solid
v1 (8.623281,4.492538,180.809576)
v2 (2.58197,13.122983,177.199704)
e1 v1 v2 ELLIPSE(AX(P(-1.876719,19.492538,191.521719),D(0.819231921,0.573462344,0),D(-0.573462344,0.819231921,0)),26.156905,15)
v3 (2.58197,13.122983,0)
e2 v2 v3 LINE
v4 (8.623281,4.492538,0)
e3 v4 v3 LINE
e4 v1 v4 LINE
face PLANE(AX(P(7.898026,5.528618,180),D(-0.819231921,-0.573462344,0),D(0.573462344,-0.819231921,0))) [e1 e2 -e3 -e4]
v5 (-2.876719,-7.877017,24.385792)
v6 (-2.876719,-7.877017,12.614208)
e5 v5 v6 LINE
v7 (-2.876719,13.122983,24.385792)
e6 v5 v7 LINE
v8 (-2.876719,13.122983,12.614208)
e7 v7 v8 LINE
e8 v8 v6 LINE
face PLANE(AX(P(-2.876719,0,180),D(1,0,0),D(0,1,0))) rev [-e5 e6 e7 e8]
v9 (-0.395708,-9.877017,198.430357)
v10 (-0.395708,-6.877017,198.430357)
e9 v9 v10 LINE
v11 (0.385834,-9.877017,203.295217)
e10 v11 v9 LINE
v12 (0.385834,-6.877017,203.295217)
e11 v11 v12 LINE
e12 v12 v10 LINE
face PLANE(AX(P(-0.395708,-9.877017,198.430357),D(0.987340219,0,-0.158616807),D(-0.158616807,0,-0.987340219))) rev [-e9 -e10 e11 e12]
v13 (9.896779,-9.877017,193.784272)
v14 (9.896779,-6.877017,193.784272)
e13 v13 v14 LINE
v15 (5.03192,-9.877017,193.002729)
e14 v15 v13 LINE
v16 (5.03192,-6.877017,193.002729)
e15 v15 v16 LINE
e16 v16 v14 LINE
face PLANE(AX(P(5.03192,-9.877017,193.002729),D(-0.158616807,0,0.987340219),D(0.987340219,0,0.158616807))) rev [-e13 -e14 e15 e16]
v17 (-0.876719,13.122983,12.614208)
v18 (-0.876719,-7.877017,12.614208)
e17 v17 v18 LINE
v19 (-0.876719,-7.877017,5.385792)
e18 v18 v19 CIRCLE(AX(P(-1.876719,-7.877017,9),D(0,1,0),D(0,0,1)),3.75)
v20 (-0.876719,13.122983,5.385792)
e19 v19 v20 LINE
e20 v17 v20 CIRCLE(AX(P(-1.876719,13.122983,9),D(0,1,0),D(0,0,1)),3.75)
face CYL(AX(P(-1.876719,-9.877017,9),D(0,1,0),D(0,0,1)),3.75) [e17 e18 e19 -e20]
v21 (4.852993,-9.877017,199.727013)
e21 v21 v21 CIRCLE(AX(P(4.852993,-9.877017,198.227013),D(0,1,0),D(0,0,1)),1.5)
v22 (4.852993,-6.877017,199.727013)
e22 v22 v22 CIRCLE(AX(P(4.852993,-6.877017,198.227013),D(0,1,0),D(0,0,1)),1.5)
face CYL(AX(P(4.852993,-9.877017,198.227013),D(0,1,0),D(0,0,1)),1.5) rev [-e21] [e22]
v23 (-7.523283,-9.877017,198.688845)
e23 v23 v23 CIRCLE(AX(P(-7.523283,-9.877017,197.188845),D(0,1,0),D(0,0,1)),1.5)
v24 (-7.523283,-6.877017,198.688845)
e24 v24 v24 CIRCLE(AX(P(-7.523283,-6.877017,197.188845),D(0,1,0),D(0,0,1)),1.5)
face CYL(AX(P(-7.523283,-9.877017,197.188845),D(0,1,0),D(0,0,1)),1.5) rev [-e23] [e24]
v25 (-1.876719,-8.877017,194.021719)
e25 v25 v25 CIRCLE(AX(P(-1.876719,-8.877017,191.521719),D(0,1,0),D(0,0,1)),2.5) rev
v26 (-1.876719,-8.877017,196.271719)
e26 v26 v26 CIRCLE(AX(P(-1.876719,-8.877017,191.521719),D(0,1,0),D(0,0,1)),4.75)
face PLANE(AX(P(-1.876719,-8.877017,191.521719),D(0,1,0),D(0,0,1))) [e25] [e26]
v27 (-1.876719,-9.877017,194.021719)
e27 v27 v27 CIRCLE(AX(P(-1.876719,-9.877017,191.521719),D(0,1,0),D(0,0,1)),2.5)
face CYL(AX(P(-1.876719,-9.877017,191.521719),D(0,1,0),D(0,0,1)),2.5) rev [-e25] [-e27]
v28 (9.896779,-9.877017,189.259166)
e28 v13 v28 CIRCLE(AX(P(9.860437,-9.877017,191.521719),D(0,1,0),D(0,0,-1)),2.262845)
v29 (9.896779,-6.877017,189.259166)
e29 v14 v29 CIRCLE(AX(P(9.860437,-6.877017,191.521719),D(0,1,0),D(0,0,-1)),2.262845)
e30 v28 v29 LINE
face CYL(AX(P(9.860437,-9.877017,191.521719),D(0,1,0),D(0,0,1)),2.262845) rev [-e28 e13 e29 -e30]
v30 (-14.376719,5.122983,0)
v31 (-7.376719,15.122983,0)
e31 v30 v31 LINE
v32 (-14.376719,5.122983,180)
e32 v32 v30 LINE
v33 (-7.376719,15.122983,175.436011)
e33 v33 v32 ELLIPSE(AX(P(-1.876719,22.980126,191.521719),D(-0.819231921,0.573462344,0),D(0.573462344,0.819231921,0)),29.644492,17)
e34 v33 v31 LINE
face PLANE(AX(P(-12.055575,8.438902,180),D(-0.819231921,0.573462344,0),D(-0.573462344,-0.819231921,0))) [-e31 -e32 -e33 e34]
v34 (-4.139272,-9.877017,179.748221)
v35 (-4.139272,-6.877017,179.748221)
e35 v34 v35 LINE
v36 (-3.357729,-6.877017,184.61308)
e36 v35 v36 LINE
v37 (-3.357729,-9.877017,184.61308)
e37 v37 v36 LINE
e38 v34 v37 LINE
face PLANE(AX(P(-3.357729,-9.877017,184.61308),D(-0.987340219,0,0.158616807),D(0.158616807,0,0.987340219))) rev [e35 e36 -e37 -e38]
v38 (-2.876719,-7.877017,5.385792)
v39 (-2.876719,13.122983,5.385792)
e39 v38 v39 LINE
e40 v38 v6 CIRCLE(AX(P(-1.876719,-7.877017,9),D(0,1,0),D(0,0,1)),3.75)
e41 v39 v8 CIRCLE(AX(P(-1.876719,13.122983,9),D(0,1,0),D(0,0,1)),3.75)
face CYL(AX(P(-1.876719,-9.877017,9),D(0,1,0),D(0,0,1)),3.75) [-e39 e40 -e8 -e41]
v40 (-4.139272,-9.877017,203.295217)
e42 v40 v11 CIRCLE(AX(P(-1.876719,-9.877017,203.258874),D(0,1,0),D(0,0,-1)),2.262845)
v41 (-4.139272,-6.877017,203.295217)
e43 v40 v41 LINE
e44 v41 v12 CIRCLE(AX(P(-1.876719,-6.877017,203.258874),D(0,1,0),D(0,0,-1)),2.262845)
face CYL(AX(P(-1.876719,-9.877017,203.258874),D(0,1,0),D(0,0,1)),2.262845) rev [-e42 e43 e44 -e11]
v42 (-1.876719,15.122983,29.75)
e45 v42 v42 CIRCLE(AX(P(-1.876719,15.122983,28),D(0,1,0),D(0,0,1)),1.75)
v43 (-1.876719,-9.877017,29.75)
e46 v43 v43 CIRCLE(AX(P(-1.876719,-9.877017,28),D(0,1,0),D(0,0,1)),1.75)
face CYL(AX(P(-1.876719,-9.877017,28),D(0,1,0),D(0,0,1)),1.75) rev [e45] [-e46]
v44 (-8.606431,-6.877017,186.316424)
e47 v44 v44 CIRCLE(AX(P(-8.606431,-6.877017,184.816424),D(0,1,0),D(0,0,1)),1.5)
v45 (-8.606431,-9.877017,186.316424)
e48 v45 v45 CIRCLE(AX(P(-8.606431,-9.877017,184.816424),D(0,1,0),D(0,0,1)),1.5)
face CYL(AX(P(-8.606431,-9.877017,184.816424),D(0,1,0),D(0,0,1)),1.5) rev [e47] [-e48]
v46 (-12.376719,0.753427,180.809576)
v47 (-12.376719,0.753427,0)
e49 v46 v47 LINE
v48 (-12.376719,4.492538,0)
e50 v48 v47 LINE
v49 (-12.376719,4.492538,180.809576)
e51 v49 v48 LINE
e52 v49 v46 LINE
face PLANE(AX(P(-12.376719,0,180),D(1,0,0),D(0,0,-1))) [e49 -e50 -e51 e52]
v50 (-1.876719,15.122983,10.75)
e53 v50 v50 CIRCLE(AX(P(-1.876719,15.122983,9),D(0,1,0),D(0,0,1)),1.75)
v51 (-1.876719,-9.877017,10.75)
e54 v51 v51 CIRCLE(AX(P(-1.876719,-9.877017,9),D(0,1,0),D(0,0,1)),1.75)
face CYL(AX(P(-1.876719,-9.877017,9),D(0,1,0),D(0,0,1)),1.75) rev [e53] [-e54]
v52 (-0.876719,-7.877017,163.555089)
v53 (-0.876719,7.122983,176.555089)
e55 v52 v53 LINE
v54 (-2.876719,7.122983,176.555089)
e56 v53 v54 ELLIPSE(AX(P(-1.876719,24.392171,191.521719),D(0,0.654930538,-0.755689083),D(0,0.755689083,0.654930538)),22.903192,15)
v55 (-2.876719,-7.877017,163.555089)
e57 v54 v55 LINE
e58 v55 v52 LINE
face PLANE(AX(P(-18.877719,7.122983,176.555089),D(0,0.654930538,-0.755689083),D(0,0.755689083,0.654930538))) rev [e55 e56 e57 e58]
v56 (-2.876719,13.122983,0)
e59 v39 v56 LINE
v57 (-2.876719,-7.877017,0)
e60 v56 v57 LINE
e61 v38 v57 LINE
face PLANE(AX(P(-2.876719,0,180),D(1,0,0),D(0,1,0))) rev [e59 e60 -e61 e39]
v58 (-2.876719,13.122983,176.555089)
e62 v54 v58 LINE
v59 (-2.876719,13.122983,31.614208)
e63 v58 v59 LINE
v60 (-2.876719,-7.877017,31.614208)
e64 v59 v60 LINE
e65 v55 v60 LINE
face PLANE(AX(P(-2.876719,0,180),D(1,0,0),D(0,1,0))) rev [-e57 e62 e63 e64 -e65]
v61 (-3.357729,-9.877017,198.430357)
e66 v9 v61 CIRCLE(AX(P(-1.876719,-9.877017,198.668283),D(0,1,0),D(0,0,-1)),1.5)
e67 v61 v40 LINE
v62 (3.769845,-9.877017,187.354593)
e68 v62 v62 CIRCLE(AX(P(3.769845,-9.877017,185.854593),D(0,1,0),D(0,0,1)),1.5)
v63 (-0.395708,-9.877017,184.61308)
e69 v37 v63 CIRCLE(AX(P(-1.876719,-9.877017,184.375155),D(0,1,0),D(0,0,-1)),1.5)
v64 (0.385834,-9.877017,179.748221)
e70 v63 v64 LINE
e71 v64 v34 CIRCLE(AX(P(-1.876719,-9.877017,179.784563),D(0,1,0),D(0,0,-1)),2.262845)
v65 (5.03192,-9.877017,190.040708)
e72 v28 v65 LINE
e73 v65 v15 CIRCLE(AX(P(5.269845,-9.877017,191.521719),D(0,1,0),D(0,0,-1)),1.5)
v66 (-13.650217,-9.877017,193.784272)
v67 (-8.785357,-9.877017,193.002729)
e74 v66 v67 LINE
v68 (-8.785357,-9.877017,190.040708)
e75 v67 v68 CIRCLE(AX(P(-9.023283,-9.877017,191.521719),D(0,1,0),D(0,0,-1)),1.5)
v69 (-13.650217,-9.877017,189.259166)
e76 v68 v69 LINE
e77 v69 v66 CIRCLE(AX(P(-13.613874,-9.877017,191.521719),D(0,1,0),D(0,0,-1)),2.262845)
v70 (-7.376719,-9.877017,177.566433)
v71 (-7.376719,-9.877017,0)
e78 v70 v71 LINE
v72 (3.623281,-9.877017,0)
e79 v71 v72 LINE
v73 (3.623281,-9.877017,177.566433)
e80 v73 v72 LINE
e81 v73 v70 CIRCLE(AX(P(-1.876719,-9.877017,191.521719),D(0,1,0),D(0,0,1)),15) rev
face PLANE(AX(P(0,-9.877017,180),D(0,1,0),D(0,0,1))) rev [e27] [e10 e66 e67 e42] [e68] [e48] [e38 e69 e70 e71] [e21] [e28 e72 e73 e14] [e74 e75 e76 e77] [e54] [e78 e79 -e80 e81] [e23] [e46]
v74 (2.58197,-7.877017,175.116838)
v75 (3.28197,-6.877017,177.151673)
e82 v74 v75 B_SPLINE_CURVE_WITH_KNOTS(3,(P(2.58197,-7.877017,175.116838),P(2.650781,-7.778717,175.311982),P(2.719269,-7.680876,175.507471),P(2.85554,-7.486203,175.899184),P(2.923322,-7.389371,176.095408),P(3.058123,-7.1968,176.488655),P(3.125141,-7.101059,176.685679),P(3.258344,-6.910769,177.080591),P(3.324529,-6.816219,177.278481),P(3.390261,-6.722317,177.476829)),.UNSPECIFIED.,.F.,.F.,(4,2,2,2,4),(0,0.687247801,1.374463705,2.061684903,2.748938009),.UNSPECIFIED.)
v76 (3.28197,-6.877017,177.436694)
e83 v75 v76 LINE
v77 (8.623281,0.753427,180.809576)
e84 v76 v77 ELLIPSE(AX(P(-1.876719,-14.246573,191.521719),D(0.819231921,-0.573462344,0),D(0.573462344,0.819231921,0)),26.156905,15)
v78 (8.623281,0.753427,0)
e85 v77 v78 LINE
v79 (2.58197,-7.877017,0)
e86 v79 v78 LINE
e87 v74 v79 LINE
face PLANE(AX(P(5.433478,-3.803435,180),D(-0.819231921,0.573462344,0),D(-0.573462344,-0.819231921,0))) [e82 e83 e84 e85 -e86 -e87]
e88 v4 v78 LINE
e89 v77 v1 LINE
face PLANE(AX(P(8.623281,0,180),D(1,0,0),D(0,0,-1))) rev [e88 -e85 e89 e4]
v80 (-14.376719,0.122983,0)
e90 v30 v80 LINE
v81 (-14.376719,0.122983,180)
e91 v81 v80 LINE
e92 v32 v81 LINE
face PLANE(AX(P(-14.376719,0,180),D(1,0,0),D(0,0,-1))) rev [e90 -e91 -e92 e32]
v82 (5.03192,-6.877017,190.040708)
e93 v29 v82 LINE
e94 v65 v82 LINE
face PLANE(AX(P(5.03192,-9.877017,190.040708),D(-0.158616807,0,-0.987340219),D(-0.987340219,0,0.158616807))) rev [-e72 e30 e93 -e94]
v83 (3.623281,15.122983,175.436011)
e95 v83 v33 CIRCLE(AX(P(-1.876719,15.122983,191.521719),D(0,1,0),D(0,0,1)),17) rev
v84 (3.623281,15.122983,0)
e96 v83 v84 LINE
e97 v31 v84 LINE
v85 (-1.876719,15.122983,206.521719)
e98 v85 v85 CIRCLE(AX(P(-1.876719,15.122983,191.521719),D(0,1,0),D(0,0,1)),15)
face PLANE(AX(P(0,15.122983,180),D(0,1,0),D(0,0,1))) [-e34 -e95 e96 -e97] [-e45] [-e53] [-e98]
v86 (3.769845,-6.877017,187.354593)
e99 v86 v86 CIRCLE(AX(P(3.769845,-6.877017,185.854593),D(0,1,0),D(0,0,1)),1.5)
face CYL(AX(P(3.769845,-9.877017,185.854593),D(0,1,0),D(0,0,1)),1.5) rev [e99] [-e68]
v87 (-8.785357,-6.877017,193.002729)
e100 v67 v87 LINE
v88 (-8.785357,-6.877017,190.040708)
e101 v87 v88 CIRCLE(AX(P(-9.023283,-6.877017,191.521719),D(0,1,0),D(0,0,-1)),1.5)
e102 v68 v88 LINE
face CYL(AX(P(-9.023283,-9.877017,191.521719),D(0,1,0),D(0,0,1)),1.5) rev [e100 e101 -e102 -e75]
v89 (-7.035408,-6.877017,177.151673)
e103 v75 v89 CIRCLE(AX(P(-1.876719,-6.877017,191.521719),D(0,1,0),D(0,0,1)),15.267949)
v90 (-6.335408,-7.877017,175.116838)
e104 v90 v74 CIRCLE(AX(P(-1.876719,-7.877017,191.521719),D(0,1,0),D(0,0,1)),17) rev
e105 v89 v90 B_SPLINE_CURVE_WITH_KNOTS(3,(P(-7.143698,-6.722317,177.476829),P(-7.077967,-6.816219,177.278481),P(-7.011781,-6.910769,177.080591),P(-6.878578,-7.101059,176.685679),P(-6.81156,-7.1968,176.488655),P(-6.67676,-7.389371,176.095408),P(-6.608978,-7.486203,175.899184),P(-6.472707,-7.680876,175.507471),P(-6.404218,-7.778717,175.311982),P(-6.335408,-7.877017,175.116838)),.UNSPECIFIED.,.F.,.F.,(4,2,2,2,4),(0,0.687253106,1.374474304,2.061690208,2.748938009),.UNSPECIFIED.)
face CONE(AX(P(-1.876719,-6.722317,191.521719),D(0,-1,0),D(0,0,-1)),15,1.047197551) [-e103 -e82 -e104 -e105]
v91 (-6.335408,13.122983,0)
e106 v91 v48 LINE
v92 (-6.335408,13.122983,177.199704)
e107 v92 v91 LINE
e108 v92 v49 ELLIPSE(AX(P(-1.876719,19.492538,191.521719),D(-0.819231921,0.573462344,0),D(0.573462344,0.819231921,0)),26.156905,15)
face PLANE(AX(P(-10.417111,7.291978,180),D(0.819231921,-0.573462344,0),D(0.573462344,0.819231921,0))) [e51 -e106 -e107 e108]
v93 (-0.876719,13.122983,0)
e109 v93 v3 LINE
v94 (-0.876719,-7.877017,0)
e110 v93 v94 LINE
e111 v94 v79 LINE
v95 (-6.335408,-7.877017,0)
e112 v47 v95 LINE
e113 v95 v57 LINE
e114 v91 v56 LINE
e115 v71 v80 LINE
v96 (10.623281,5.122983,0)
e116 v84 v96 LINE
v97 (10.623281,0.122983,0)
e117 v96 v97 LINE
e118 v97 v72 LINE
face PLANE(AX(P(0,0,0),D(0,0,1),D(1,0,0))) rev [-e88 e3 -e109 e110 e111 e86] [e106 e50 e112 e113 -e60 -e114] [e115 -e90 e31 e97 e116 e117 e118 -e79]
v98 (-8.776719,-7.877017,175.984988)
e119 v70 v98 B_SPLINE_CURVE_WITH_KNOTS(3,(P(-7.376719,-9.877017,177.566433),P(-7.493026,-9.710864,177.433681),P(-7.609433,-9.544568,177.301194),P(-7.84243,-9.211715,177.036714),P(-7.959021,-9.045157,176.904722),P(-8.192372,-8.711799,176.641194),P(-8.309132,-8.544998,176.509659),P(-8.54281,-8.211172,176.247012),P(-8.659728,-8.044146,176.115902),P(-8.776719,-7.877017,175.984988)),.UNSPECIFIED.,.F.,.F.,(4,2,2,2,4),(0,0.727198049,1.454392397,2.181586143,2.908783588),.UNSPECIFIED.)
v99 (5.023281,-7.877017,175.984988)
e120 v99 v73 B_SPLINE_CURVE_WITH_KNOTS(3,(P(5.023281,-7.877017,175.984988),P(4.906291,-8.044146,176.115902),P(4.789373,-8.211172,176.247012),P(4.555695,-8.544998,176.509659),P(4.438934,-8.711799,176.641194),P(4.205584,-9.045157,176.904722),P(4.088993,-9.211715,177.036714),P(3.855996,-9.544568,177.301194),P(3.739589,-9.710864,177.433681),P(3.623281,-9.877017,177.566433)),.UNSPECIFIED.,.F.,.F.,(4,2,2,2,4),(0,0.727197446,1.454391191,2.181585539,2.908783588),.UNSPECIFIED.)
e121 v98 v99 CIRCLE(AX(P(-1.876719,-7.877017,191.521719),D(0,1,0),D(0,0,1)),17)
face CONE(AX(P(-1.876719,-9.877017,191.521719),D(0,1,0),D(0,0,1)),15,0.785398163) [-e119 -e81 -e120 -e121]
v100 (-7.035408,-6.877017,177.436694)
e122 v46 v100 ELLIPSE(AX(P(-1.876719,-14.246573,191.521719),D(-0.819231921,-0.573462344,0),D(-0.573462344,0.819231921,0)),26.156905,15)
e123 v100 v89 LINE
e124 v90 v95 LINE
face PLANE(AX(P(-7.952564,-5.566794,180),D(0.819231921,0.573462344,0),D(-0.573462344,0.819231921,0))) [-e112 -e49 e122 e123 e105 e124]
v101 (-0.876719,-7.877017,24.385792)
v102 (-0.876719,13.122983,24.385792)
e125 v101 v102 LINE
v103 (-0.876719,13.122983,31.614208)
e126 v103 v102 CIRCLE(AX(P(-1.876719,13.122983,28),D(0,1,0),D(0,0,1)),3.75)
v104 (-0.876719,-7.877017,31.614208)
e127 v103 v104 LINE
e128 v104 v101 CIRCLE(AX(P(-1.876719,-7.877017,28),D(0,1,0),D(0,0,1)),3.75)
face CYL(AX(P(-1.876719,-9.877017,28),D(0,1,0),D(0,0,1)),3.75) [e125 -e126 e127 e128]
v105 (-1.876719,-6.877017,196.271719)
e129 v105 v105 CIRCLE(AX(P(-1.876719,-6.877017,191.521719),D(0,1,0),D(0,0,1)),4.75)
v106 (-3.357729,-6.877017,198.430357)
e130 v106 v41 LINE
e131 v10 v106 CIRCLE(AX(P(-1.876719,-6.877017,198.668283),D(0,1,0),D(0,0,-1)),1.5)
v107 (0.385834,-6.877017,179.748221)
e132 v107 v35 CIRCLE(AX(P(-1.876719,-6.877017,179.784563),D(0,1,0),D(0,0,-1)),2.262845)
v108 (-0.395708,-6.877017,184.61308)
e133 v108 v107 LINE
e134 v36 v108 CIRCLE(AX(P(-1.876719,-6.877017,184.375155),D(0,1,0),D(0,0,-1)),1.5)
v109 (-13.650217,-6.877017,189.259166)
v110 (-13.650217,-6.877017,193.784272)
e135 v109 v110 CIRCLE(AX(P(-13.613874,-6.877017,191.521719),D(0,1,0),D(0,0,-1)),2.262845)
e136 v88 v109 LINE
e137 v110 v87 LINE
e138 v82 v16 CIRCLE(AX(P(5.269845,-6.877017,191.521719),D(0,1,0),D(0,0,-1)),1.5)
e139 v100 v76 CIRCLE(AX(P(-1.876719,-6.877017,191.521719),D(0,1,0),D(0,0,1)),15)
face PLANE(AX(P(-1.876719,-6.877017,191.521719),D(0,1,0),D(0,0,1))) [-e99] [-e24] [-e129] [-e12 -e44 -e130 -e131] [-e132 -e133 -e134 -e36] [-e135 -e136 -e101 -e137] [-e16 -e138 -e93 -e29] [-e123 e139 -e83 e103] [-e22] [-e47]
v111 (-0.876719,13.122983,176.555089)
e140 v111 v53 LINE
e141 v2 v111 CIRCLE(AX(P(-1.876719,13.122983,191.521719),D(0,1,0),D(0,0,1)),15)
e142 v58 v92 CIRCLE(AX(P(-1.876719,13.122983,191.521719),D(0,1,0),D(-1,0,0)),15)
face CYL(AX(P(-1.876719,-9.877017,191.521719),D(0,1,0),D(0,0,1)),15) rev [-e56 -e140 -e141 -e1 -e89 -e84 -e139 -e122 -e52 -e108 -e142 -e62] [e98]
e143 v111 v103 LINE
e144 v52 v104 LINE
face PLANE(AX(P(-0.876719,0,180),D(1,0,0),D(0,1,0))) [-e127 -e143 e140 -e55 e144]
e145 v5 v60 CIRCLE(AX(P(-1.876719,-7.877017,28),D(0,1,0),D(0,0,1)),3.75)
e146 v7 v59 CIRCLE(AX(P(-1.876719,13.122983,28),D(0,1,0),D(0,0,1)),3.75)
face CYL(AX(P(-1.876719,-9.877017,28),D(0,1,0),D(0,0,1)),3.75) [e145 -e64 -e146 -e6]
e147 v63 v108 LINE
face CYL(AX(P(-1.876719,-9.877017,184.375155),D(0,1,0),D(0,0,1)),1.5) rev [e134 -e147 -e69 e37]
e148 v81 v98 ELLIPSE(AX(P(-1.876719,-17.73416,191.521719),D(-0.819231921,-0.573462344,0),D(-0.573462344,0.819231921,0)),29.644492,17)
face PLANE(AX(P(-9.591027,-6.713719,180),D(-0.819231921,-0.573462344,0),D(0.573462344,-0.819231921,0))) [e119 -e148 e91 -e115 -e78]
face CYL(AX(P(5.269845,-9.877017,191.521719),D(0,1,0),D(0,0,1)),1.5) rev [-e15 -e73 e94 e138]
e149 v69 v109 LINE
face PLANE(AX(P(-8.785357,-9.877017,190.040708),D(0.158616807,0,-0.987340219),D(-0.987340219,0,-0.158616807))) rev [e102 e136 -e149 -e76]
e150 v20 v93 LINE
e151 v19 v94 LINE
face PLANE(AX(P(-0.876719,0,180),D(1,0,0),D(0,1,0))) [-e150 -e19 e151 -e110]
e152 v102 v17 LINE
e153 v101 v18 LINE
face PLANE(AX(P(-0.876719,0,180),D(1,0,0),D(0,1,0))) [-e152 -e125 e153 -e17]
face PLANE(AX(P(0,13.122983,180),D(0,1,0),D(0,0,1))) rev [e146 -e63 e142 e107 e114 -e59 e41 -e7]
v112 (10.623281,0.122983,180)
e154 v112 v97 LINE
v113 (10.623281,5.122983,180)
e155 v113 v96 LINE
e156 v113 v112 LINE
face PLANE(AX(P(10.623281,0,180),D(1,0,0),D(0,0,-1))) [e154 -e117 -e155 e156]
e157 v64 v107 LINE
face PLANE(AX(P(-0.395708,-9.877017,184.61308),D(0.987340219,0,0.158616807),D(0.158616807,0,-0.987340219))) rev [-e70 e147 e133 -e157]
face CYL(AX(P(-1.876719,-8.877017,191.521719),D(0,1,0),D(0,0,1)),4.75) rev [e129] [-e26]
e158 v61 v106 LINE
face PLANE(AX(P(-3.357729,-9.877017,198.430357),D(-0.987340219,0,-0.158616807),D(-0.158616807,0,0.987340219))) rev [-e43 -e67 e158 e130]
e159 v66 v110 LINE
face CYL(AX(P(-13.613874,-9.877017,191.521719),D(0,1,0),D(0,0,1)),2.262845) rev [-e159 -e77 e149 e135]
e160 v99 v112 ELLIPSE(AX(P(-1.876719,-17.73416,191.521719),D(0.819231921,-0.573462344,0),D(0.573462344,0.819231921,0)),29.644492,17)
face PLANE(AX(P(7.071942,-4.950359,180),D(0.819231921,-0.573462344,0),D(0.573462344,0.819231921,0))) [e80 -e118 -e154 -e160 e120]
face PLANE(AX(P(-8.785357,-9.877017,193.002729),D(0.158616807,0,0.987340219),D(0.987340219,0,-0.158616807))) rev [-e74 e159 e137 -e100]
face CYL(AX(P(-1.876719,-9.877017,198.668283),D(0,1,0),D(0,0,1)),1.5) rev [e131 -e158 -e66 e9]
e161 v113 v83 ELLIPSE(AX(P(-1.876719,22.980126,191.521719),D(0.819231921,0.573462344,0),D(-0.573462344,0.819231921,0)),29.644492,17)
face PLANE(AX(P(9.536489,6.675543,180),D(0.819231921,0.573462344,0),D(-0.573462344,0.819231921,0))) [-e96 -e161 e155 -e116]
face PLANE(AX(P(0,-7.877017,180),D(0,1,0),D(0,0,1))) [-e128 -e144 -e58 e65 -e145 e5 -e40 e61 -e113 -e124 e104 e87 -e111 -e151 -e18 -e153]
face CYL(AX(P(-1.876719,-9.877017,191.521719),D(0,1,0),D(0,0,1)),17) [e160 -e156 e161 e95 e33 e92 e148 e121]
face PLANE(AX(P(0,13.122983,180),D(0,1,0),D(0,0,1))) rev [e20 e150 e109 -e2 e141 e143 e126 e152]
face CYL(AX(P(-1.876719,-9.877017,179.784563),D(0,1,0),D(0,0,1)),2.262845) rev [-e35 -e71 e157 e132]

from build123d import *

# Parameters (mm, degrees)
ESTRUSIONE_ESTRUSIONE1_DEPTH = 180
SCHIZZO3_R                   = 17
TAGLIO_ESTRUSIONE2_DEPTH     = 183.295611683
SCHIZZO4_R                   = 15
ESTRUSIONE_ESTRUSIONE2_DEPTH = 25
ESTRUSIONE_ESTRUSIONE3_START = -2
SCHIZZO6_R                   = 15
ESTRUSIONE_ESTRUSIONE3_DEPTH = 2
TAGLIO_ESTRUSIONE4_REACH     = 211.92
TAGLIO_ESTRUSIONE5_REACH     = 211.843
ESTRUSIONE_ESTRUSIONE4_START = 1
SCHIZZO11_R                  = 15
ESTRUSIONE_ESTRUSIONE4_DEPTH = 1
SMUSSO1_SIZE                 = 2
SMUSSO1_SIZE_2               = 1.154700538
SMUSSO2_SIZE                 = 2
SCHIZZO12_R                  = 2.5
TAGLIO_ESTRUSIONE6_DEPTH     = 211.527047297
SCHIZZO13_R                  = 4.75
TAGLIO_ESTRUSIONE7_DEPTH     = 2
SCHIZZO14_R                  = 1.5
TAGLIO_ESTRUSIONE9_DEPTH     = 211.527047297
SCHIZZO15_R                  = 3.75
ESTRUSIONE_ESTRUSIONE5_DEPTH = 25
SCHIZZO16_R                  = 1.75
TAGLIO_ESTRUSIONE10_DEPTH    = 211.861655223
TAGLIO_ESTRUSIONE11_DEPTH    = 211.527047297


# Some blends are built 0.0001 mm under size
with BuildPart() as part:
    # Schizzo1 → Estrusione-Estrusione1 (new body)
    with BuildSketch(Plane.XY):
        Polygon((10.623281363, 5.122982669), (3.623281363, 15.122982669), (-7.376718637, 15.122982669), (-14.376718637, 5.122982669), (-14.376718637, 0.122982669), (-7.376718637, -9.877017331), (3.623281363, -9.877017331), (10.623281363, 0.122982669), align=None)
        Polygon((-12.376718637, 4.492538208), (-6.335407514, 13.122982669), (-2.876718637, 13.122982669), (-2.876718637, -7.877017331), (-6.335407514, -7.877017331), (-12.376718637, 0.753427131), align=None, mode=Mode.SUBTRACT)
        Polygon((2.58197024, -7.877017331), (-0.876718637, -7.877017331), (-0.876718637, 13.122982669), (2.58197024, 13.122982669), (8.623281363, 4.492538208), (8.623281363, 0.753427131), align=None, mode=Mode.SUBTRACT)
    extrude(amount=ESTRUSIONE_ESTRUSIONE1_DEPTH)

    # Schizzo3 → Taglio-Estrusione2 (cut, through all)
    with BuildSketch(Plane(origin=(0, 15.122982669, 0), x_dir=(1, 0, 0), z_dir=(0, 1, 0))):
        with Locations((-1.876718637, -191.521718622)):
            Circle(SCHIZZO3_R)
    extrude(amount=-TAGLIO_ESTRUSIONE2_DEPTH, mode=Mode.SUBTRACT)

    # Schizzo4 → Estrusione-Estrusione2 (add, through all)
    with BuildSketch(Plane(origin=(0, 15.122982669, 0), x_dir=(1, 0, 0), z_dir=(0, 1, 0))):
        with BuildLine():
            ThreePointArc((-7.376718637, -175.43601068), (-1.876718637, -208.521718622), (3.623281363, -175.43601068))
            ThreePointArc((3.623281363, -175.43601068), (-1.876718637, -174.521718622), (-7.376718637, -175.43601068))
        make_face()
        with Locations(Location((-1.876718637, -191.521718622, 0), (0, 0, 270))):
            Circle(SCHIZZO4_R, mode=Mode.SUBTRACT)
    extrude(amount=-ESTRUSIONE_ESTRUSIONE2_DEPTH)

    # Schizzo6 → Estrusione-Estrusione3 (add)
    with BuildSketch(Plane.XZ.offset(9.877017331).offset(ESTRUSIONE_ESTRUSIONE3_START)):
        with Locations(Location((-1.876718637, 191.521718622, 0), (0, 0, 90))):
            Circle(SCHIZZO6_R)
    extrude(amount=ESTRUSIONE_ESTRUSIONE3_DEPTH)

    # Schizzo8 → Taglio-Estrusione4 (cut, up to next)
    with BuildSketch(Plane(origin=(0, 0, 0), x_dir=(-1, 0, 0), z_dir=(0, 0, -1)), mode=Mode.PRIVATE) as taglio_estrusione4_sk1:
        Polygon((0.876718637, -7.877017331), (-2.58197024, -7.877017331), (-8.623281363, 0.753427131), (-8.623281363, 4.492538208), (-2.58197024, 13.122982669), (0.876718637, 13.122982669), align=None)
    taglio_estrusione4_tool1 = extrude(taglio_estrusione4_sk1.sketch, amount=-TAGLIO_ESTRUSIONE4_REACH, mode=Mode.PRIVATE) & part.part
    # Schizzo8 → Taglio-Estrusione4 (cut, up to next)
    with BuildSketch(Plane(origin=(0, 0, 0), x_dir=(-1, 0, 0), z_dir=(0, 0, -1)), mode=Mode.PRIVATE) as taglio_estrusione4_sk2:
        Polygon((2.876718637, -7.877017331), (2.876718637, 13.122982669), (6.335407514, 13.122982669), (12.376718637, 4.492538208), (12.376718637, 0.753427131), (6.335407514, -7.877017331), align=None)
    taglio_estrusione4_tool2 = extrude(taglio_estrusione4_sk2.sketch, amount=-TAGLIO_ESTRUSIONE4_REACH, mode=Mode.PRIVATE) & part.part
    add(taglio_estrusione4_tool1.solids().sort_by_distance((2.905149, 2.622983, 0))[0], mode=Mode.SUBTRACT)
    add(taglio_estrusione4_tool2.solids().sort_by_distance((-6.658586, 2.622983, 0))[0], mode=Mode.SUBTRACT)

    # Schizzo10 → Taglio-Estrusione5 (cut, up to next)
    with BuildSketch(Plane(origin=(-0.876718637, 0, 0), x_dir=(0, 0, -1), z_dir=(1, 0, 0)), mode=Mode.PRIVATE) as taglio_estrusione5_sk1:
        Polygon((-176.555089075, -7.877017331), (-176.555089075, 7.122982669), (-163.555089075, -7.877017331), align=None)
    taglio_estrusione5_tool1 = extrude(taglio_estrusione5_sk1.sketch, amount=-TAGLIO_ESTRUSIONE5_REACH, mode=Mode.PRIVATE) & part.part
    add(taglio_estrusione5_tool1.solids().sort_by_distance((-0.876719, -2.877017, 172.221756))[0], mode=Mode.SUBTRACT)

    # Schizzo11 → Estrusione-Estrusione4 (add)
    with BuildSketch(Plane(origin=(0, -7.877017331, 0), x_dir=(1, 0, 0), z_dir=(0, 1, 0)).offset(ESTRUSIONE_ESTRUSIONE4_START)):
        with Locations(Location((-1.876718637, -191.521718622, 0), (0, 0, 270))):
            Circle(SCHIZZO11_R)
    extrude(amount=-ESTRUSIONE_ESTRUSIONE4_DEPTH)

    # Smusso1
    # the kernel refuses this chamfer: 2, 1.154700538 mm, written as the material it adds along each edge
    with BuildSketch(Plane(origin=(-1.876718637, -7.877017331, 191.521718622), x_dir=(0.6026136012063945, 0, -0.7980331118700906), z_dir=(0.7980331118700906, 0, 0.6026136012063945))) as smusso1_piece_1_section:
        Polygon((15 + SMUSSO1_SIZE, 0), (15, SMUSSO1_SIZE_2), (15, 0), align=None)
    smusso1_piece_1 = revolve(axis=Axis((-1.876718637, -7.877017331, 191.521718622), (0, 1, 0)), revolution_arc=74.114626536, mode=Mode.PRIVATE)
    smusso1_piece_1 = split(smusso1_piece_1, bisect_by=Plane(origin=(5.278960516, -6.877017331, 177.600505235), z_dir=(0, -1, 0)), keep=Keep.TOP, mode=Mode.PRIVATE)
    add(smusso1_piece_1)

    # Smusso2
    smusso2_edges = [part.edges().sort_by_distance(p)[0] for p in [
        (-1.876718637, -9.877017331, 208.521718622),
    ]]
    chamfer(smusso2_edges, length=SMUSSO2_SIZE - 0.0001)  # a hair under: the kernel refuses the full size

    # Schizzo12 → Taglio-Estrusione6 (cut, through all)
    with BuildSketch(Plane(origin=(0, -6.877017331, 0), x_dir=(1, 0, 0), z_dir=(0, 1, 0))):
        with Locations(Location((-1.876718637, -191.521718622, 0), (0, 0, 270))):
            Circle(SCHIZZO12_R)
    extrude(amount=-TAGLIO_ESTRUSIONE6_DEPTH, mode=Mode.SUBTRACT)

    # Schizzo13 → Taglio-Estrusione7 (cut)
    with BuildSketch(Plane(origin=(0, -6.877017331, 0), x_dir=(1, 0, 0), z_dir=(0, 1, 0))):
        with Locations(Location((-1.876718637, -191.521718622, 0), (0, 0, 270))):
            Circle(SCHIZZO13_R)
    extrude(amount=-TAGLIO_ESTRUSIONE7_DEPTH, mode=Mode.SUBTRACT)

    # Schizzo14 → Taglio-Estrusione9 (cut, through all)
    with BuildSketch(Plane(origin=(0, -6.877017331, 0), x_dir=(1, 0, 0), z_dir=(0, 1, 0))):
        with Locations(Location((4.852993382, -198.227013257, 0), (0, 0, 270))):
            Circle(SCHIZZO14_R)
        with Locations(Location((-8.606430656, -184.816423987, 0), (0, 0, 270))):
            Circle(SCHIZZO14_R)
        with Locations(Location((-7.52328254, -197.188844533, 0), (0, 0, 270))):
            Circle(SCHIZZO14_R)
        with Locations(Location((3.769845266, -185.854592711, 0), (0, 0, 270))):
            Circle(SCHIZZO14_R)
    extrude(amount=-TAGLIO_ESTRUSIONE9_DEPTH, mode=Mode.SUBTRACT)

    # Schizzo15 → Estrusione-Estrusione5 (add)
    with BuildSketch(Plane(origin=(0, 15.122982669, 0), x_dir=(1, 0, 0), z_dir=(0, 1, 0))):
        with Locations((-1.876718637, -28)):
            Circle(SCHIZZO15_R)
        with Locations((-1.876718637, -9)):
            Circle(SCHIZZO15_R)
    extrude(amount=-ESTRUSIONE_ESTRUSIONE5_DEPTH)

    # Schizzo16 → Taglio-Estrusione10 (cut, through all)
    with BuildSketch(Plane(origin=(0, 15.122982669, 0), x_dir=(1, 0, 0), z_dir=(0, 1, 0))):
        with Locations(Location((-1.876718637, -28, 0), (0, 0, 270))):
            Circle(SCHIZZO16_R)
        with Locations(Location((-1.876718637, -9, 0), (0, 0, 270))):
            Circle(SCHIZZO16_R)
    extrude(amount=-TAGLIO_ESTRUSIONE10_DEPTH, mode=Mode.SUBTRACT)

    # Schizzo17 → Taglio-Estrusione11 (cut, through all)
    with BuildSketch(Plane(origin=(0, -6.877017331, 0), x_dir=(1, 0, 0), z_dir=(0, 1, 0))):
        with BuildLine():
            Line((-8.78535733, -190.040708293), (-13.650216694, -189.259165677))
            ThreePointArc((-13.650216694, -189.259165677), (-15.876718637, -191.521718622), (-13.650216694, -193.784271566))
            Line((-13.650216694, -193.784271566), (-8.78535733, -193.002728951))
            ThreePointArc((-8.78535733, -193.002728951), (-7.52328254, -191.521718622), (-8.78535733, -190.040708293))
        make_face()
        with BuildLine():
            Line((-0.395708308, -184.613079929), (0.385834308, -179.748220565))
            ThreePointArc((0.385834308, -179.748220565), (-1.876718637, -177.521718622), (-4.139271581, -179.748220565))
            Line((-4.139271581, -179.748220565), (-3.357728966, -184.613079929))
            ThreePointArc((-3.357728966, -184.613079929), (-1.876718637, -185.875154719), (-0.395708308, -184.613079929))
        make_face()
        with BuildLine():
            Line((5.031920056, -193.002728951), (9.89677942, -193.784271566))
            ThreePointArc((9.89677942, -193.784271566), (12.123281363, -191.521718622), (9.89677942, -189.259165677))
            Line((9.89677942, -189.259165677), (5.031920056, -190.040708293))
            ThreePointArc((5.031920056, -190.040708293), (3.769845266, -191.521718622), (5.031920056, -193.002728951))
        make_face()
        with BuildLine():
            Line((-3.357728966, -198.430357315), (-4.139271581, -203.295216678))
            ThreePointArc((-4.139271581, -203.295216678), (-1.876718637, -205.521718622), (0.385834308, -203.295216678))
            Line((0.385834308, -203.295216678), (-0.395708308, -198.430357315))
            ThreePointArc((-0.395708308, -198.430357315), (-1.876718637, -197.168282525), (-3.357728966, -198.430357315))
        make_face()
    extrude(amount=-TAGLIO_ESTRUSIONE11_DEPTH, mode=Mode.SUBTRACT)


solid = part.part
